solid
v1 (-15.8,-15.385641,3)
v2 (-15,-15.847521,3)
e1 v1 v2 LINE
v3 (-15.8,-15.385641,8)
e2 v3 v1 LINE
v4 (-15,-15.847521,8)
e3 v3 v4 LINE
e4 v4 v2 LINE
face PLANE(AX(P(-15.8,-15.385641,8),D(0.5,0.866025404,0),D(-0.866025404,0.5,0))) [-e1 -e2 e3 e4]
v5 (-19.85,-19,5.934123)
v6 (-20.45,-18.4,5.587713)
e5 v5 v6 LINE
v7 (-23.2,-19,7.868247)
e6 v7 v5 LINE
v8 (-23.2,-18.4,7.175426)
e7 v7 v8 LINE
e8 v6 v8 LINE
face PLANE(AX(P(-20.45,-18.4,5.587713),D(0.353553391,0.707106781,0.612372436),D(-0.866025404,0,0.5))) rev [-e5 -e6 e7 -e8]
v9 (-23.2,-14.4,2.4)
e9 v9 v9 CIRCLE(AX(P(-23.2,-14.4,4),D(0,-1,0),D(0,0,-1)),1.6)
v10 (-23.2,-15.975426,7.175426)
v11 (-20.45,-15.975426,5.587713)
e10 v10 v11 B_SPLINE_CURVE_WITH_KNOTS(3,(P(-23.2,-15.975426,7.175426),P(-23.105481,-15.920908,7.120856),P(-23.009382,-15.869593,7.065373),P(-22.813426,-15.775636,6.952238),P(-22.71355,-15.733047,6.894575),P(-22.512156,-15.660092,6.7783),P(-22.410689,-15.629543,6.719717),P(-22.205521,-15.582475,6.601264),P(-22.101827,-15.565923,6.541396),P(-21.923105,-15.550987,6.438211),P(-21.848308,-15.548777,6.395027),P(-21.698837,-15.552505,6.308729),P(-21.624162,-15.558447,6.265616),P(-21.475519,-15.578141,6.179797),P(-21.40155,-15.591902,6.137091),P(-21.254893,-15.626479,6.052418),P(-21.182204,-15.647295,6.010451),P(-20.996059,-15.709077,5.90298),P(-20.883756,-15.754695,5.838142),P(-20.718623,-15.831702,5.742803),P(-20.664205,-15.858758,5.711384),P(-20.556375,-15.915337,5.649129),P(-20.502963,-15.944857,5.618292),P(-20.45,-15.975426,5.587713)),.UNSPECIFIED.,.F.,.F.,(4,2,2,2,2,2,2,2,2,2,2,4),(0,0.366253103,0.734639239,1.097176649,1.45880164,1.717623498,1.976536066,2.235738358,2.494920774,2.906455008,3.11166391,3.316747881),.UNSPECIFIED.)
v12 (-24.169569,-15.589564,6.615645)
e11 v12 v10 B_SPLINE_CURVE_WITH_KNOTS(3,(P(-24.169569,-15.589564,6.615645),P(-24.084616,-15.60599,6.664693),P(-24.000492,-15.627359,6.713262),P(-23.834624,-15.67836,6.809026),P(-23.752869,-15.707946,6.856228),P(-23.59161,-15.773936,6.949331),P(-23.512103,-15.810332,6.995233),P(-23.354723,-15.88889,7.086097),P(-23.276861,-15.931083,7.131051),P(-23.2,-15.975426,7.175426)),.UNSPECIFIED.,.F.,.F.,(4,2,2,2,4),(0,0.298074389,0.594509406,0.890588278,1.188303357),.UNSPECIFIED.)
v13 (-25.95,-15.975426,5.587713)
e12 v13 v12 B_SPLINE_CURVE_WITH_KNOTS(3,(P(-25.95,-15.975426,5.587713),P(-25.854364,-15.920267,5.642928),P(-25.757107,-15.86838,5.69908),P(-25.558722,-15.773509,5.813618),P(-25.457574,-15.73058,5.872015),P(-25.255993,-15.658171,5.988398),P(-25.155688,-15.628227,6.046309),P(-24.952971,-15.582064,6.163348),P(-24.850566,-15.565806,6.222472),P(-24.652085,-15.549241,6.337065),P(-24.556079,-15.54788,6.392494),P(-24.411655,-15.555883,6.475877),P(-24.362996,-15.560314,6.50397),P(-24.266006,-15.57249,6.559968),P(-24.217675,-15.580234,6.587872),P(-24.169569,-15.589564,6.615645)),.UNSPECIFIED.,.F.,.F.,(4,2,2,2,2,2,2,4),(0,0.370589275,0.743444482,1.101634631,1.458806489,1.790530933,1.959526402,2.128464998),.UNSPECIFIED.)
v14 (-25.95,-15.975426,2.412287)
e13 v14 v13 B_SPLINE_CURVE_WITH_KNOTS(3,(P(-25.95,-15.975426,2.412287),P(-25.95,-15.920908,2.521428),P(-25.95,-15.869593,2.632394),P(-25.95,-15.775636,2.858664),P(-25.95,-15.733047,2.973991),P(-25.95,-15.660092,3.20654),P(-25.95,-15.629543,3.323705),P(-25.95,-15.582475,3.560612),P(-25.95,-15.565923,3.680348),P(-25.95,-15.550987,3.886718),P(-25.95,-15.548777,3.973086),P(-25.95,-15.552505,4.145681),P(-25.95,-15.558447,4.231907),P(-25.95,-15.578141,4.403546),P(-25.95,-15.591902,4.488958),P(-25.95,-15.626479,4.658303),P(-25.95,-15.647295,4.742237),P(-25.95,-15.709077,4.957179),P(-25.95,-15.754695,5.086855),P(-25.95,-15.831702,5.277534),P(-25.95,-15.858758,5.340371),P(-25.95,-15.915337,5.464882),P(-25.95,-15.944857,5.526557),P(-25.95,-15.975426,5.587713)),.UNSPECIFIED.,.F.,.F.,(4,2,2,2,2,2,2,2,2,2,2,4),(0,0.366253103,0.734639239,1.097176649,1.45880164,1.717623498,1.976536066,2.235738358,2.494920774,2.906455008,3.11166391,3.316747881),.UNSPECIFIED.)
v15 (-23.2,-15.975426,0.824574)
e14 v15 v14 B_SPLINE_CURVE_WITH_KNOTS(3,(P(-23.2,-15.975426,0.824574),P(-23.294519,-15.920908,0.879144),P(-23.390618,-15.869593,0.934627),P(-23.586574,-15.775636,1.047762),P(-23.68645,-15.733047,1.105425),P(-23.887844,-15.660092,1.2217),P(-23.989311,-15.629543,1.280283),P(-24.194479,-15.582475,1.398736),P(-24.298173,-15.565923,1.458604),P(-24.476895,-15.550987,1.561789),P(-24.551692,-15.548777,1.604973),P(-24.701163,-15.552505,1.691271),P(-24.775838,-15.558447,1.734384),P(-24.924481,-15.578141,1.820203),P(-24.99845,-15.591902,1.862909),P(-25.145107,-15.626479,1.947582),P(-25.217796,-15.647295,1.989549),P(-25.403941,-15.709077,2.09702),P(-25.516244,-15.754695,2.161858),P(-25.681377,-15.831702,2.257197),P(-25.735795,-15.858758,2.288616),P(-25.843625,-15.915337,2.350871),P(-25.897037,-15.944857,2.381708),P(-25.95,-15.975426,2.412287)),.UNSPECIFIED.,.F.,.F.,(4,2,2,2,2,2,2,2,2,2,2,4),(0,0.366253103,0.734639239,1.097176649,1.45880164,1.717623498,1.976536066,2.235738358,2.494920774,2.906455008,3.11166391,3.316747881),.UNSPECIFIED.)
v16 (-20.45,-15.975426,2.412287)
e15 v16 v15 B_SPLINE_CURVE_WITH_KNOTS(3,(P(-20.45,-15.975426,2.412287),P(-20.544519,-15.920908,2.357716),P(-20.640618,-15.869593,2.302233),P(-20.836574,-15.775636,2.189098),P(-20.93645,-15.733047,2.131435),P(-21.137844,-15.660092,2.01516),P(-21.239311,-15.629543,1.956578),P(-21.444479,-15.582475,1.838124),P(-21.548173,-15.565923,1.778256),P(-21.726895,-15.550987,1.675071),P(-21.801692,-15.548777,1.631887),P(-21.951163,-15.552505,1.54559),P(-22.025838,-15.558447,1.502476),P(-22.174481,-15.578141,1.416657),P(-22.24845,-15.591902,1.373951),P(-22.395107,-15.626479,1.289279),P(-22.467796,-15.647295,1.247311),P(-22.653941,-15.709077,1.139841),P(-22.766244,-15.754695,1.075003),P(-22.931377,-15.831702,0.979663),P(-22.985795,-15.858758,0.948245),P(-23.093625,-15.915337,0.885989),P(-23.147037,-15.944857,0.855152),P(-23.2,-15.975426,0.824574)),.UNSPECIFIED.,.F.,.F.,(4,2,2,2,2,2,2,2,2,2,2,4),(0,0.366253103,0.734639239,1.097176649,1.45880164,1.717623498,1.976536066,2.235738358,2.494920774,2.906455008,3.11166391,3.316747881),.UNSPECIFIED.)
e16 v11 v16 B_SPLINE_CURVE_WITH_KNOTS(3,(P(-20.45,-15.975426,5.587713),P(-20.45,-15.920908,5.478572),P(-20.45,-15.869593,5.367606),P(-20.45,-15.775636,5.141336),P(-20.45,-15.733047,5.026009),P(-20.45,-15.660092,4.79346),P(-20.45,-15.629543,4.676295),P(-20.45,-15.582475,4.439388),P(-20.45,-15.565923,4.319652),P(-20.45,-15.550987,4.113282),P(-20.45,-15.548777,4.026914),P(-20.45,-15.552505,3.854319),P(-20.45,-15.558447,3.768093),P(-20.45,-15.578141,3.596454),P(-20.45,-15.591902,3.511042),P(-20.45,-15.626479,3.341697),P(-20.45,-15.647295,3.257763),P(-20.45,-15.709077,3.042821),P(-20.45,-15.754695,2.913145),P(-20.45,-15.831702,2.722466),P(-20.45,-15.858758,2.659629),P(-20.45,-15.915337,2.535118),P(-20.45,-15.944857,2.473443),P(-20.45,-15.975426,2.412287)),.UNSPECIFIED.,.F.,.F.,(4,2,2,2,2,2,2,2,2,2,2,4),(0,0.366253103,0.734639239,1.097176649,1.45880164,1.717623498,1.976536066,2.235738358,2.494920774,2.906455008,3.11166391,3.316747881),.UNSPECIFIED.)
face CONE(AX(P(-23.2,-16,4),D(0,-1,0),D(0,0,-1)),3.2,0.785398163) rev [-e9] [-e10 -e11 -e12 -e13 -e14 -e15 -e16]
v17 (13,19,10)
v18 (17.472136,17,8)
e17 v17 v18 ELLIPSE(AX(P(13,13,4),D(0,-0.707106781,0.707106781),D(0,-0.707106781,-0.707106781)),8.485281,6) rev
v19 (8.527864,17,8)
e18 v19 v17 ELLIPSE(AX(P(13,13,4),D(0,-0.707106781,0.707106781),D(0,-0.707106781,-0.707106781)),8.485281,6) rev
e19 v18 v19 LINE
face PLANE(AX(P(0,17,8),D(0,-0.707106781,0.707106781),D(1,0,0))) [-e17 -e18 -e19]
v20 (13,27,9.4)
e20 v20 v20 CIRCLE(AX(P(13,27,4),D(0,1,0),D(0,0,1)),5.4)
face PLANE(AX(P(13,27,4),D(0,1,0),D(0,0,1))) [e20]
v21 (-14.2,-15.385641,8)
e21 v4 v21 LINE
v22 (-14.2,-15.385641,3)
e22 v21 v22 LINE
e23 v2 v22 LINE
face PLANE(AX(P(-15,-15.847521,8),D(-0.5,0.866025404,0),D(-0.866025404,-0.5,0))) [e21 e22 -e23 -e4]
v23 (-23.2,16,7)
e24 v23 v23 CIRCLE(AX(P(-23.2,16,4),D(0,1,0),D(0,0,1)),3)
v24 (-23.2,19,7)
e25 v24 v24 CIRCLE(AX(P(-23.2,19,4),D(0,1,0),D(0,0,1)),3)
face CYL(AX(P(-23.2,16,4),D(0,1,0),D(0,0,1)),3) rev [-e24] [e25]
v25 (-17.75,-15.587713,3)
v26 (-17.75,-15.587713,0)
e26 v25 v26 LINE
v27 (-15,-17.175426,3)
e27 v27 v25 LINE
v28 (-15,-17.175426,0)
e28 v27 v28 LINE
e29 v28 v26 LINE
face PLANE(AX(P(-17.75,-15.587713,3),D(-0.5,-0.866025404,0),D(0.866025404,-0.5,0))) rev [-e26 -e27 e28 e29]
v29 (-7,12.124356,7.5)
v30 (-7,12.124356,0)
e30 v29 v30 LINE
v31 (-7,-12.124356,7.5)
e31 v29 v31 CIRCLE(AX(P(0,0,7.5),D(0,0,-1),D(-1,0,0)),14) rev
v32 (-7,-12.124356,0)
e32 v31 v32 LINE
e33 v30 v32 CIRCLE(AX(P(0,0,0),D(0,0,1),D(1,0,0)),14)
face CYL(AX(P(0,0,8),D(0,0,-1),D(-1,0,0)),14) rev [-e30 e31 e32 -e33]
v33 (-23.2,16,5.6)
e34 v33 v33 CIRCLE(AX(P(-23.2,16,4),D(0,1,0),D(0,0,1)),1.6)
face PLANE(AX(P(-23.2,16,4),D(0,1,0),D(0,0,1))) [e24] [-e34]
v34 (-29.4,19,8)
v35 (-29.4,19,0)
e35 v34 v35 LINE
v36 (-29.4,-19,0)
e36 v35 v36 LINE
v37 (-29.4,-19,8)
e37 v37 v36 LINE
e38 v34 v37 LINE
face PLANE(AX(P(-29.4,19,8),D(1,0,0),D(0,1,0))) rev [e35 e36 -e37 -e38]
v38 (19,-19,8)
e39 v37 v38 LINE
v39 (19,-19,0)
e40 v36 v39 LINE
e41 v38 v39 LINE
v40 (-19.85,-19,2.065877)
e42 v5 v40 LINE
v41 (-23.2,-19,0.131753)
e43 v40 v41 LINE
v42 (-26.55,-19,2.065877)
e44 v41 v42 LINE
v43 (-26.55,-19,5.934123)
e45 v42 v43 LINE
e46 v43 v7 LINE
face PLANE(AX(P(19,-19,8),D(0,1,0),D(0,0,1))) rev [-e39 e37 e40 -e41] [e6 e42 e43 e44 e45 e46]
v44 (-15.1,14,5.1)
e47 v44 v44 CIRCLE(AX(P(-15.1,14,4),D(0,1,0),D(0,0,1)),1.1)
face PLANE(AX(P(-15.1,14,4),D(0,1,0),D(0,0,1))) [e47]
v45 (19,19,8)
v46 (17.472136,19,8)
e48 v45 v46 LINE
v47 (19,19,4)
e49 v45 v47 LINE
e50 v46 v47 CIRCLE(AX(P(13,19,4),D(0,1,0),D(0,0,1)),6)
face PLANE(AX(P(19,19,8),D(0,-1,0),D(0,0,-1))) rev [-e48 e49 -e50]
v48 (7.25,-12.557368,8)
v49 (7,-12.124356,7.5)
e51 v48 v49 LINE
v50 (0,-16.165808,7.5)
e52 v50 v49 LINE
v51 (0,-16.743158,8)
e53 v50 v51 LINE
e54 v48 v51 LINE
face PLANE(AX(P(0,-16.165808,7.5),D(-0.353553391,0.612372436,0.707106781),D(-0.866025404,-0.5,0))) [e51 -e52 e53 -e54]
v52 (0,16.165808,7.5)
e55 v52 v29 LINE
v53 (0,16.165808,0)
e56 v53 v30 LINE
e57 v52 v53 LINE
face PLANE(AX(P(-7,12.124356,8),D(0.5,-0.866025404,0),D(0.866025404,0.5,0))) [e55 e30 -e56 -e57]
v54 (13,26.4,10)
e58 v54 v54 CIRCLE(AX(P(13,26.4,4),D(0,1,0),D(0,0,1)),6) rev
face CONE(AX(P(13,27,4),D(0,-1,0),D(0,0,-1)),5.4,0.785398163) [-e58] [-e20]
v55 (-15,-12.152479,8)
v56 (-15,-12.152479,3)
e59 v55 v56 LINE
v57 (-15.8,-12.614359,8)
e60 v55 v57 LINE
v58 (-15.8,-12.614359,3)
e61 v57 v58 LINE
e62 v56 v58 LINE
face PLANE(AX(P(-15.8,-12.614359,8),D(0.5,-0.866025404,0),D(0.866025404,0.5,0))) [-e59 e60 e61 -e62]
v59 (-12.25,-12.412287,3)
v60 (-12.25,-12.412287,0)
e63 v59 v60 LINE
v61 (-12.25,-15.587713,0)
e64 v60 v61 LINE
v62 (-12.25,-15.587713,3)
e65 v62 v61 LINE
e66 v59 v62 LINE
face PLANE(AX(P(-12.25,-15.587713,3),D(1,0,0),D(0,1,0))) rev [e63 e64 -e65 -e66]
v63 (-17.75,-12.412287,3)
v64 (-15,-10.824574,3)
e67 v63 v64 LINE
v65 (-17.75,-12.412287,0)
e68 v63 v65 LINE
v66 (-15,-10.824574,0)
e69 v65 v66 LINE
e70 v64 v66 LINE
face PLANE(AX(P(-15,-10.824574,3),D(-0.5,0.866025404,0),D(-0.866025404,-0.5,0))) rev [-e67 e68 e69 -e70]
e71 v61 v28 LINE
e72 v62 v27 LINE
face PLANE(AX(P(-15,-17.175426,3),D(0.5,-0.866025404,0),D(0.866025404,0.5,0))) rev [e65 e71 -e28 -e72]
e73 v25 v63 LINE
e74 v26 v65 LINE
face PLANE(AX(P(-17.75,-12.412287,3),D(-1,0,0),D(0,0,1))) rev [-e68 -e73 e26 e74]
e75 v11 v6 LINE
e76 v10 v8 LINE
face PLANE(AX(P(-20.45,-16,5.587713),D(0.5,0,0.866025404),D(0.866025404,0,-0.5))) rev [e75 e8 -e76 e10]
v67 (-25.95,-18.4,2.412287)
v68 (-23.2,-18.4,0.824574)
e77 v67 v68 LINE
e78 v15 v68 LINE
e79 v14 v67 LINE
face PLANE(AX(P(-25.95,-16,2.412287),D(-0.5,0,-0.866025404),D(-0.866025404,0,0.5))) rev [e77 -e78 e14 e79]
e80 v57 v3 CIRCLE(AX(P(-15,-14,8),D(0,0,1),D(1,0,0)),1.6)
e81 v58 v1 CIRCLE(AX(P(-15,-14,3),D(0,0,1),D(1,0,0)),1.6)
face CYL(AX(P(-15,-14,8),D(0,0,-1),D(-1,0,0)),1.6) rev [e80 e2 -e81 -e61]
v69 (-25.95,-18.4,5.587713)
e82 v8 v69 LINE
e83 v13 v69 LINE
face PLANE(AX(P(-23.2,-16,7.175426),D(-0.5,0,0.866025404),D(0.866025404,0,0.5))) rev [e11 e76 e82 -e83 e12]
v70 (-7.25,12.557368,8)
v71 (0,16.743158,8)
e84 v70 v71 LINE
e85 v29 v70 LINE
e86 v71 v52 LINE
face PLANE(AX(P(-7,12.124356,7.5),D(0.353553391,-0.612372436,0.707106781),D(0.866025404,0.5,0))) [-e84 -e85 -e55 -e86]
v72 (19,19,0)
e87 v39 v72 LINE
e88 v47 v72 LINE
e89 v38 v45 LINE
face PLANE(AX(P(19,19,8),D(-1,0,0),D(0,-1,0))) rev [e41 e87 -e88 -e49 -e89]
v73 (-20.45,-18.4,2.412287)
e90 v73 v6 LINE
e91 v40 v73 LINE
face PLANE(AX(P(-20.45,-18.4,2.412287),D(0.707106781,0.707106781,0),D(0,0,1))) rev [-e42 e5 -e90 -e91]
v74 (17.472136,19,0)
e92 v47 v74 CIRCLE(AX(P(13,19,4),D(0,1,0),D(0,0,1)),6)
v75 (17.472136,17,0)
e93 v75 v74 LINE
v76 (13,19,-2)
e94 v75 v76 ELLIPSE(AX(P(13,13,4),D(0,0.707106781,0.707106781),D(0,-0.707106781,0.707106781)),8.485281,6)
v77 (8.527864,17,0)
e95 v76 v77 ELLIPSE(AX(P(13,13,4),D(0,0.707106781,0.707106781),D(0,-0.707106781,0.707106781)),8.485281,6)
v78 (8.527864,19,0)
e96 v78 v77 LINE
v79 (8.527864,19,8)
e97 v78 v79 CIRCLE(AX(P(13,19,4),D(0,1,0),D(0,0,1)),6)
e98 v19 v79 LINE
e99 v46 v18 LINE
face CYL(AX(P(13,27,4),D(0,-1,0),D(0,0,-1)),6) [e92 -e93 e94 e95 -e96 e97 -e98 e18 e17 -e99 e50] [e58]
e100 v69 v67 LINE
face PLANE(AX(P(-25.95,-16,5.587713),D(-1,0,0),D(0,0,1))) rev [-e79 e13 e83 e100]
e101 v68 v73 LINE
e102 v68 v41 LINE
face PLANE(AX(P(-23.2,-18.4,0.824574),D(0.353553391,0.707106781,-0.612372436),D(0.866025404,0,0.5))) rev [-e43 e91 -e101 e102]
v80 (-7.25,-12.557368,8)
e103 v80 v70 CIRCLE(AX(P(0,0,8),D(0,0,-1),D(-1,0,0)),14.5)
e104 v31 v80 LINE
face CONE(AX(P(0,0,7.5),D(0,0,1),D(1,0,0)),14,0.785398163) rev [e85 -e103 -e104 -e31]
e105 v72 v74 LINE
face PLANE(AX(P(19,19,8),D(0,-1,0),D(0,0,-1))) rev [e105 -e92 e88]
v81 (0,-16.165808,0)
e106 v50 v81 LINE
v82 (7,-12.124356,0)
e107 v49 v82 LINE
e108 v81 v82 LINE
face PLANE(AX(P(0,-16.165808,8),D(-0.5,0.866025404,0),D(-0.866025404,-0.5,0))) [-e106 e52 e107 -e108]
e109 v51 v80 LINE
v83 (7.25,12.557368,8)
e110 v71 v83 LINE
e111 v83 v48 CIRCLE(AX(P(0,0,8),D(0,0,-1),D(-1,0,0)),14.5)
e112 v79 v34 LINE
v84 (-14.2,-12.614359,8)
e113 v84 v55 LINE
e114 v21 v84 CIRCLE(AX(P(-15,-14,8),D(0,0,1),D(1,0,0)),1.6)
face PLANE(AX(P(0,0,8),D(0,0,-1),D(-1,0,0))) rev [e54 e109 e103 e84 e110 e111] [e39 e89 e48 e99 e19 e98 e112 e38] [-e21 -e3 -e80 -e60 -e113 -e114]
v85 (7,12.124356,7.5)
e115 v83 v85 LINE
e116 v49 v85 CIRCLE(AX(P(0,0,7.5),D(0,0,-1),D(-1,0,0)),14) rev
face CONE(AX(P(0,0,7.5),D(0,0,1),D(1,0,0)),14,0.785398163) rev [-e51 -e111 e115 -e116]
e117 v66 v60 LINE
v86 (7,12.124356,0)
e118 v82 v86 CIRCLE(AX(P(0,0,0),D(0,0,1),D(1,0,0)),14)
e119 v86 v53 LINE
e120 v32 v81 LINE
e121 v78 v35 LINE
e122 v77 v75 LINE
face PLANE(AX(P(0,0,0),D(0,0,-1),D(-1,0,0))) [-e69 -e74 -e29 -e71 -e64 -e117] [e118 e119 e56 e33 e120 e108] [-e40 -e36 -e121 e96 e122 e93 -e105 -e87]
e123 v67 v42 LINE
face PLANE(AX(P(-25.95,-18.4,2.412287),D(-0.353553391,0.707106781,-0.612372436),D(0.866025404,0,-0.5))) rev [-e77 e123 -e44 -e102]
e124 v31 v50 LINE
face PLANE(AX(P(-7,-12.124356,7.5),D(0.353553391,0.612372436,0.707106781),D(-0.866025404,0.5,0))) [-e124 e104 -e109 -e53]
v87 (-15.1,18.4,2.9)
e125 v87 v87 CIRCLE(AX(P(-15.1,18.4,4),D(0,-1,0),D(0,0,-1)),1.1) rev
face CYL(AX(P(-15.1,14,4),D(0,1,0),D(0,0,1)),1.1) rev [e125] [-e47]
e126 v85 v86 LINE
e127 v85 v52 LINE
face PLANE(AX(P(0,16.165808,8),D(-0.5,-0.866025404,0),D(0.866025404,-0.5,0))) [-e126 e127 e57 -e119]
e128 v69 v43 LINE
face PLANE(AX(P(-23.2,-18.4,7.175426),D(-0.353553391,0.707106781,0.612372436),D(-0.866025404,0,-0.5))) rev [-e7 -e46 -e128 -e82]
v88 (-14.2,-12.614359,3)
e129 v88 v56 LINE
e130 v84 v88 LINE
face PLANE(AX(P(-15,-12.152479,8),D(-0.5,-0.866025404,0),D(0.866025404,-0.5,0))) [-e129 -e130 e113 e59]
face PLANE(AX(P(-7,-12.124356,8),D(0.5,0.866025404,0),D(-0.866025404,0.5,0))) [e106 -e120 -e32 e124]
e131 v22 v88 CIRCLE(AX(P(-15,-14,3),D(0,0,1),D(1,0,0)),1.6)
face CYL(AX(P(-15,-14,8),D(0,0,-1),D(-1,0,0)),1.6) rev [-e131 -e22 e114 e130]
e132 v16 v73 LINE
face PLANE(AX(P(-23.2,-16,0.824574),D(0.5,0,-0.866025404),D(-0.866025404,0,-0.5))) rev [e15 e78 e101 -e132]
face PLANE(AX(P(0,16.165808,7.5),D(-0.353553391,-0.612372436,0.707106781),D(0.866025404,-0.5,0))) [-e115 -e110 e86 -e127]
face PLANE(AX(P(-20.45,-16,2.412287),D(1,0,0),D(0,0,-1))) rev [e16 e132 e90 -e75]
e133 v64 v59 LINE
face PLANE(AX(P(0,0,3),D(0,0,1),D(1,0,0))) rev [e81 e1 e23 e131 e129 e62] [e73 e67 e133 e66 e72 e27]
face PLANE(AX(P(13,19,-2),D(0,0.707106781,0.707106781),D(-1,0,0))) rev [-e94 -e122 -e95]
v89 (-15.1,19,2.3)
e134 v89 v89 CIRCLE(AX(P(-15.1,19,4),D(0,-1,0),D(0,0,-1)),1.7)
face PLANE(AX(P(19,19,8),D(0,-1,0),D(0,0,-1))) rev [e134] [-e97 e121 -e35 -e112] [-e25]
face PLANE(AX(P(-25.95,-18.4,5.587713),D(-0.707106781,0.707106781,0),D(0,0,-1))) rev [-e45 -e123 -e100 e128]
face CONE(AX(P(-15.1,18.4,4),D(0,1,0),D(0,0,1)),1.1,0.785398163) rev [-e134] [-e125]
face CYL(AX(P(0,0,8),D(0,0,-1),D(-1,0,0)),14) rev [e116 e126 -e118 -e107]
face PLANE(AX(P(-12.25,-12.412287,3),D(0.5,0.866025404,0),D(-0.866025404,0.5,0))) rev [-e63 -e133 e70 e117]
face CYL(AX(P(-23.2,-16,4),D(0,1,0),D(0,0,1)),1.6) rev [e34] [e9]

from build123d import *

# Parameters (mm, degrees)
SKETCH1_W           = 48.4
SKETCH1_H           = 38
BOSS_EXTRUDE1_DEPTH = 8
SKETCH2_R           = 3
CUT_EXTRUDE1_DEPTH  = 3
SKETCH3_R           = 1.6
CUT_EXTRUDE2_DEPTH  = 32
CUT_EXTRUDE3_DEPTH  = 3
CUT_EXTRUDE4_DEPTH  = 3
SKETCH6_R           = 1.1
CUT_EXTRUDE5_DEPTH  = 5
CHAMFER1_SIZE       = 0.6
CHAMFER2_SIZE       = 0.5
CHAMFER3_SIZE       = 1.6
SKETCH8_R           = 6
BOSS_EXTRUDE2_DEPTH = 8
CHAMFER4_SIZE       = 2
CHAMFER5_SIZE       = 0.6


with BuildPart() as part:
    # Sketch1 → Boss-Extrude1 (new body)
    with BuildSketch(Plane.XY):
        with Locations((-5.2, 0)):
            Rectangle(SKETCH1_W, SKETCH1_H)
        with BuildLine():
            Line((-7, 12.124355653), (0, 16.165807537))
            Line((0, 16.165807537), (7, 12.124355653))
            ThreePointArc((7, 12.124355653), (14, 0), (7, -12.124355653))
            Line((7, -12.124355653), (0, -16.165807537))
            Line((0, -16.165807537), (-7, -12.124355653))
            ThreePointArc((-7, -12.124355653), (-14, 0), (-7, 12.124355653))
        make_face(mode=Mode.SUBTRACT)
        with BuildLine():
            Line((-15.8, -12.614359354), (-15, -12.152479139))
            Line((-15, -12.152479139), (-14.2, -12.614359354))
            ThreePointArc((-14.2, -12.614359354), (-13.4, -14), (-14.2, -15.385640646))
            Line((-14.2, -15.385640646), (-15, -15.847520861))
            Line((-15, -15.847520861), (-15.8, -15.385640646))
            ThreePointArc((-15.8, -15.385640646), (-16.6, -14), (-15.8, -12.614359354))
        make_face(mode=Mode.SUBTRACT)
    extrude(amount=BOSS_EXTRUDE1_DEPTH)

    # Sketch2 → Cut-Extrude1 (cut)
    with BuildSketch(Plane(origin=(0, 19, 0), x_dir=(1, 0, 0), z_dir=(0, 1, 0))):
        with Locations(Location((-23.2, -4, 0), (0, 0, 270))):
            Circle(SKETCH2_R)
    extrude(amount=-CUT_EXTRUDE1_DEPTH, mode=Mode.SUBTRACT)

    # Sketch3 → Cut-Extrude2 (cut)
    with BuildSketch(Plane(origin=(0, 16, 0), x_dir=(1, 0, 0), z_dir=(0, 1, 0))):
        with Locations(Location((-23.2, -4, 0), (0, 0, 270))):
            Circle(SKETCH3_R)
    extrude(amount=-CUT_EXTRUDE2_DEPTH, mode=Mode.SUBTRACT)

    # Sketch4 → Cut-Extrude3 (cut)
    with BuildSketch(Plane.XZ.offset(19)):
        Polygon((-25.95, 5.58771324), (-25.95, 2.41228676), (-23.2, 0.824573519), (-20.45, 2.41228676), (-20.45, 5.58771324), (-23.2, 7.175426481), align=None)
    extrude(amount=-CUT_EXTRUDE3_DEPTH, mode=Mode.SUBTRACT)

    # Sketch5 → Cut-Extrude4 (cut)
    with BuildSketch(Plane(origin=(0, 0, 0), x_dir=(-1, 0, 0), z_dir=(0, 0, -1))):
        Polygon((12.25, -15.58771324), (12.25, -12.41228676), (15, -10.824573519), (17.75, -12.41228676), (17.75, -15.58771324), (15, -17.175426481), align=None)
    extrude(amount=-CUT_EXTRUDE4_DEPTH, mode=Mode.SUBTRACT)

    # Sketch6 → Cut-Extrude5 (cut)
    with BuildSketch(Plane(origin=(0, 19, 0), x_dir=(1, 0, 0), z_dir=(0, 1, 0))):
        with Locations(Location((-15.1, -4, 0), (0, 0, 270))):
            Circle(SKETCH6_R)
    extrude(amount=-CUT_EXTRUDE5_DEPTH, mode=Mode.SUBTRACT)

    # Chamfer1
    chamfer1_edges = [part.edges().sort_by_distance(p)[0] for p in [
        (-15.1, 19, 2.9),
        (-24.575, -19, 6.38156986),
        (-25.95, -19, 4),
        (-24.575, -19, 1.61843014),
        (-21.825, -19, 1.61843014),
        (-20.45, -19, 4),
        (-21.825, -19, 6.38156986),
    ]]
    chamfer(chamfer1_edges, length=CHAMFER1_SIZE)

    # Chamfer2
    chamfer2_edges = [part.edges().sort_by_distance(p)[0] for p in [
        (-14, 0, 8),
        (-3.5, -14.145081595, 8),
        (3.5, -14.145081595, 8),
        (14, 0, 8),
        (3.5, 14.145081595, 8),
        (-3.5, 14.145081595, 8),
    ]]
    chamfer(chamfer2_edges, length=CHAMFER2_SIZE)

    # Chamfer3
    # the kernel refuses this chamfer: 1.6 mm, written as the material it takes off along each edge
    with BuildSketch(Plane(origin=(-23.2, -16, 4), x_dir=(0, 0, 1), z_dir=(-1, 0, 0))) as chamfer3_piece_1_section:
        Polygon((1.6, CHAMFER3_SIZE), (1.6 + CHAMFER3_SIZE, 0), (1.6, 0), align=None)
    chamfer3_piece_1 = revolve(axis=Axis((-23.2, -16, 4), (0, 1, 0)), mode=Mode.PRIVATE)
    chamfer3_piece_1 = split(chamfer3_piece_1, bisect_by=Plane(origin=(-25.591184435, -15.183394219, 5.794875504), z_dir=(0.5000000000000009, 0, -0.8660254037844382)), keep=Keep.TOP, mode=Mode.PRIVATE)
    chamfer3_piece_1 = split(chamfer3_piece_1, bisect_by=Plane(origin=(-20.808815565, -15.183394219, 5.794875504), z_dir=(-0.4999999999999998, 0, -0.8660254037844388)), keep=Keep.TOP, mode=Mode.PRIVATE)
    chamfer3_piece_1 = split(chamfer3_piece_1, bisect_by=Plane(origin=(-25.95, -15.183394219, 1.653222572), z_dir=(1, 0, 0)), keep=Keep.TOP, mode=Mode.PRIVATE)
    chamfer3_piece_1 = split(chamfer3_piece_1, bisect_by=Plane(origin=(-20.45, -15.183394219, 1.653222572), z_dir=(-1, 0, 0)), keep=Keep.TOP, mode=Mode.PRIVATE)
    chamfer3_piece_1 = split(chamfer3_piece_1, bisect_by=Plane(origin=(-23.558815565, -15.183394219, 1.031735783), z_dir=(0.5000000000000006, 0, 0.8660254037844384)), keep=Keep.TOP, mode=Mode.PRIVATE)
    chamfer3_piece_1 = split(chamfer3_piece_1, bisect_by=Plane(origin=(-22.841184435, -15.183394219, 1.031735783), z_dir=(-0.4999999999999998, 0, 0.8660254037844388)), keep=Keep.TOP, mode=Mode.PRIVATE)
    add(chamfer3_piece_1, mode=Mode.SUBTRACT)

    # Sketch8 → Boss-Extrude2 (add)
    with BuildSketch(Plane(origin=(0, 19, 0), x_dir=(1, 0, 0), z_dir=(0, 1, 0))):
        with Locations(Location((13, -4, 0), (0, 0, 138.189685104))):
            Circle(SKETCH8_R)
    extrude(amount=BOSS_EXTRUDE2_DEPTH)

    # Chamfer4
    # the kernel refuses this chamfer: 2 mm, written as the material it adds along each edge
    with BuildSketch(Plane(origin=(22.615501931, 19, 0), x_dir=(0, -0.9996219169112968, 0.02749587661058639), z_dir=(-1, 0, 0))) as chamfer4_piece_1_section:
        Polygon((CHAMFER4_SIZE * 0.999621916911, -CHAMFER4_SIZE * 0.0274958766106), (-CHAMFER4_SIZE * 0.0274958766106, -CHAMFER4_SIZE * 0.999621916911), (0, 0), align=None)
    chamfer4_piece_1 = extrude(amount=19.231003862, mode=Mode.PRIVATE)
    chamfer4_piece_1 = chamfer4_piece_1 & Plane(origin=(13, 18.289975825, 4), x_dir=(-0.7453559924973536, 0, -0.666666666669547), z_dir=(0, -1, 0)) * Cylinder(6, 47, mode=Mode.PRIVATE)
    add(chamfer4_piece_1)
    with BuildSketch(Plane(origin=(22.615501931, 19, 8), x_dir=(0, -0.9996219169112968, -0.02749587661058651), z_dir=(-1, 0, 0))) as chamfer4_piece_2_section:
        Polygon((CHAMFER4_SIZE * 0.999621916911, CHAMFER4_SIZE * 0.0274958766106), (-CHAMFER4_SIZE * 0.0274958766106, CHAMFER4_SIZE * 0.999621916911), (0, 0), align=None)
    chamfer4_piece_2 = extrude(amount=19.231003862, mode=Mode.PRIVATE)
    chamfer4_piece_2 = chamfer4_piece_2 & Plane(origin=(13, 18.289975825, 4), x_dir=(-0.7453559924973536, 0, -0.666666666669547), z_dir=(0, -1, 0)) * Cylinder(6, 47, mode=Mode.PRIVATE)
    add(chamfer4_piece_2)

    # Chamfer5
    chamfer5_edges = [part.edges().sort_by_distance(p)[0] for p in [
        (17.472135955, 27, 8),
    ]]
    chamfer(chamfer5_edges, length=CHAMFER5_SIZE)


solid = part.part
